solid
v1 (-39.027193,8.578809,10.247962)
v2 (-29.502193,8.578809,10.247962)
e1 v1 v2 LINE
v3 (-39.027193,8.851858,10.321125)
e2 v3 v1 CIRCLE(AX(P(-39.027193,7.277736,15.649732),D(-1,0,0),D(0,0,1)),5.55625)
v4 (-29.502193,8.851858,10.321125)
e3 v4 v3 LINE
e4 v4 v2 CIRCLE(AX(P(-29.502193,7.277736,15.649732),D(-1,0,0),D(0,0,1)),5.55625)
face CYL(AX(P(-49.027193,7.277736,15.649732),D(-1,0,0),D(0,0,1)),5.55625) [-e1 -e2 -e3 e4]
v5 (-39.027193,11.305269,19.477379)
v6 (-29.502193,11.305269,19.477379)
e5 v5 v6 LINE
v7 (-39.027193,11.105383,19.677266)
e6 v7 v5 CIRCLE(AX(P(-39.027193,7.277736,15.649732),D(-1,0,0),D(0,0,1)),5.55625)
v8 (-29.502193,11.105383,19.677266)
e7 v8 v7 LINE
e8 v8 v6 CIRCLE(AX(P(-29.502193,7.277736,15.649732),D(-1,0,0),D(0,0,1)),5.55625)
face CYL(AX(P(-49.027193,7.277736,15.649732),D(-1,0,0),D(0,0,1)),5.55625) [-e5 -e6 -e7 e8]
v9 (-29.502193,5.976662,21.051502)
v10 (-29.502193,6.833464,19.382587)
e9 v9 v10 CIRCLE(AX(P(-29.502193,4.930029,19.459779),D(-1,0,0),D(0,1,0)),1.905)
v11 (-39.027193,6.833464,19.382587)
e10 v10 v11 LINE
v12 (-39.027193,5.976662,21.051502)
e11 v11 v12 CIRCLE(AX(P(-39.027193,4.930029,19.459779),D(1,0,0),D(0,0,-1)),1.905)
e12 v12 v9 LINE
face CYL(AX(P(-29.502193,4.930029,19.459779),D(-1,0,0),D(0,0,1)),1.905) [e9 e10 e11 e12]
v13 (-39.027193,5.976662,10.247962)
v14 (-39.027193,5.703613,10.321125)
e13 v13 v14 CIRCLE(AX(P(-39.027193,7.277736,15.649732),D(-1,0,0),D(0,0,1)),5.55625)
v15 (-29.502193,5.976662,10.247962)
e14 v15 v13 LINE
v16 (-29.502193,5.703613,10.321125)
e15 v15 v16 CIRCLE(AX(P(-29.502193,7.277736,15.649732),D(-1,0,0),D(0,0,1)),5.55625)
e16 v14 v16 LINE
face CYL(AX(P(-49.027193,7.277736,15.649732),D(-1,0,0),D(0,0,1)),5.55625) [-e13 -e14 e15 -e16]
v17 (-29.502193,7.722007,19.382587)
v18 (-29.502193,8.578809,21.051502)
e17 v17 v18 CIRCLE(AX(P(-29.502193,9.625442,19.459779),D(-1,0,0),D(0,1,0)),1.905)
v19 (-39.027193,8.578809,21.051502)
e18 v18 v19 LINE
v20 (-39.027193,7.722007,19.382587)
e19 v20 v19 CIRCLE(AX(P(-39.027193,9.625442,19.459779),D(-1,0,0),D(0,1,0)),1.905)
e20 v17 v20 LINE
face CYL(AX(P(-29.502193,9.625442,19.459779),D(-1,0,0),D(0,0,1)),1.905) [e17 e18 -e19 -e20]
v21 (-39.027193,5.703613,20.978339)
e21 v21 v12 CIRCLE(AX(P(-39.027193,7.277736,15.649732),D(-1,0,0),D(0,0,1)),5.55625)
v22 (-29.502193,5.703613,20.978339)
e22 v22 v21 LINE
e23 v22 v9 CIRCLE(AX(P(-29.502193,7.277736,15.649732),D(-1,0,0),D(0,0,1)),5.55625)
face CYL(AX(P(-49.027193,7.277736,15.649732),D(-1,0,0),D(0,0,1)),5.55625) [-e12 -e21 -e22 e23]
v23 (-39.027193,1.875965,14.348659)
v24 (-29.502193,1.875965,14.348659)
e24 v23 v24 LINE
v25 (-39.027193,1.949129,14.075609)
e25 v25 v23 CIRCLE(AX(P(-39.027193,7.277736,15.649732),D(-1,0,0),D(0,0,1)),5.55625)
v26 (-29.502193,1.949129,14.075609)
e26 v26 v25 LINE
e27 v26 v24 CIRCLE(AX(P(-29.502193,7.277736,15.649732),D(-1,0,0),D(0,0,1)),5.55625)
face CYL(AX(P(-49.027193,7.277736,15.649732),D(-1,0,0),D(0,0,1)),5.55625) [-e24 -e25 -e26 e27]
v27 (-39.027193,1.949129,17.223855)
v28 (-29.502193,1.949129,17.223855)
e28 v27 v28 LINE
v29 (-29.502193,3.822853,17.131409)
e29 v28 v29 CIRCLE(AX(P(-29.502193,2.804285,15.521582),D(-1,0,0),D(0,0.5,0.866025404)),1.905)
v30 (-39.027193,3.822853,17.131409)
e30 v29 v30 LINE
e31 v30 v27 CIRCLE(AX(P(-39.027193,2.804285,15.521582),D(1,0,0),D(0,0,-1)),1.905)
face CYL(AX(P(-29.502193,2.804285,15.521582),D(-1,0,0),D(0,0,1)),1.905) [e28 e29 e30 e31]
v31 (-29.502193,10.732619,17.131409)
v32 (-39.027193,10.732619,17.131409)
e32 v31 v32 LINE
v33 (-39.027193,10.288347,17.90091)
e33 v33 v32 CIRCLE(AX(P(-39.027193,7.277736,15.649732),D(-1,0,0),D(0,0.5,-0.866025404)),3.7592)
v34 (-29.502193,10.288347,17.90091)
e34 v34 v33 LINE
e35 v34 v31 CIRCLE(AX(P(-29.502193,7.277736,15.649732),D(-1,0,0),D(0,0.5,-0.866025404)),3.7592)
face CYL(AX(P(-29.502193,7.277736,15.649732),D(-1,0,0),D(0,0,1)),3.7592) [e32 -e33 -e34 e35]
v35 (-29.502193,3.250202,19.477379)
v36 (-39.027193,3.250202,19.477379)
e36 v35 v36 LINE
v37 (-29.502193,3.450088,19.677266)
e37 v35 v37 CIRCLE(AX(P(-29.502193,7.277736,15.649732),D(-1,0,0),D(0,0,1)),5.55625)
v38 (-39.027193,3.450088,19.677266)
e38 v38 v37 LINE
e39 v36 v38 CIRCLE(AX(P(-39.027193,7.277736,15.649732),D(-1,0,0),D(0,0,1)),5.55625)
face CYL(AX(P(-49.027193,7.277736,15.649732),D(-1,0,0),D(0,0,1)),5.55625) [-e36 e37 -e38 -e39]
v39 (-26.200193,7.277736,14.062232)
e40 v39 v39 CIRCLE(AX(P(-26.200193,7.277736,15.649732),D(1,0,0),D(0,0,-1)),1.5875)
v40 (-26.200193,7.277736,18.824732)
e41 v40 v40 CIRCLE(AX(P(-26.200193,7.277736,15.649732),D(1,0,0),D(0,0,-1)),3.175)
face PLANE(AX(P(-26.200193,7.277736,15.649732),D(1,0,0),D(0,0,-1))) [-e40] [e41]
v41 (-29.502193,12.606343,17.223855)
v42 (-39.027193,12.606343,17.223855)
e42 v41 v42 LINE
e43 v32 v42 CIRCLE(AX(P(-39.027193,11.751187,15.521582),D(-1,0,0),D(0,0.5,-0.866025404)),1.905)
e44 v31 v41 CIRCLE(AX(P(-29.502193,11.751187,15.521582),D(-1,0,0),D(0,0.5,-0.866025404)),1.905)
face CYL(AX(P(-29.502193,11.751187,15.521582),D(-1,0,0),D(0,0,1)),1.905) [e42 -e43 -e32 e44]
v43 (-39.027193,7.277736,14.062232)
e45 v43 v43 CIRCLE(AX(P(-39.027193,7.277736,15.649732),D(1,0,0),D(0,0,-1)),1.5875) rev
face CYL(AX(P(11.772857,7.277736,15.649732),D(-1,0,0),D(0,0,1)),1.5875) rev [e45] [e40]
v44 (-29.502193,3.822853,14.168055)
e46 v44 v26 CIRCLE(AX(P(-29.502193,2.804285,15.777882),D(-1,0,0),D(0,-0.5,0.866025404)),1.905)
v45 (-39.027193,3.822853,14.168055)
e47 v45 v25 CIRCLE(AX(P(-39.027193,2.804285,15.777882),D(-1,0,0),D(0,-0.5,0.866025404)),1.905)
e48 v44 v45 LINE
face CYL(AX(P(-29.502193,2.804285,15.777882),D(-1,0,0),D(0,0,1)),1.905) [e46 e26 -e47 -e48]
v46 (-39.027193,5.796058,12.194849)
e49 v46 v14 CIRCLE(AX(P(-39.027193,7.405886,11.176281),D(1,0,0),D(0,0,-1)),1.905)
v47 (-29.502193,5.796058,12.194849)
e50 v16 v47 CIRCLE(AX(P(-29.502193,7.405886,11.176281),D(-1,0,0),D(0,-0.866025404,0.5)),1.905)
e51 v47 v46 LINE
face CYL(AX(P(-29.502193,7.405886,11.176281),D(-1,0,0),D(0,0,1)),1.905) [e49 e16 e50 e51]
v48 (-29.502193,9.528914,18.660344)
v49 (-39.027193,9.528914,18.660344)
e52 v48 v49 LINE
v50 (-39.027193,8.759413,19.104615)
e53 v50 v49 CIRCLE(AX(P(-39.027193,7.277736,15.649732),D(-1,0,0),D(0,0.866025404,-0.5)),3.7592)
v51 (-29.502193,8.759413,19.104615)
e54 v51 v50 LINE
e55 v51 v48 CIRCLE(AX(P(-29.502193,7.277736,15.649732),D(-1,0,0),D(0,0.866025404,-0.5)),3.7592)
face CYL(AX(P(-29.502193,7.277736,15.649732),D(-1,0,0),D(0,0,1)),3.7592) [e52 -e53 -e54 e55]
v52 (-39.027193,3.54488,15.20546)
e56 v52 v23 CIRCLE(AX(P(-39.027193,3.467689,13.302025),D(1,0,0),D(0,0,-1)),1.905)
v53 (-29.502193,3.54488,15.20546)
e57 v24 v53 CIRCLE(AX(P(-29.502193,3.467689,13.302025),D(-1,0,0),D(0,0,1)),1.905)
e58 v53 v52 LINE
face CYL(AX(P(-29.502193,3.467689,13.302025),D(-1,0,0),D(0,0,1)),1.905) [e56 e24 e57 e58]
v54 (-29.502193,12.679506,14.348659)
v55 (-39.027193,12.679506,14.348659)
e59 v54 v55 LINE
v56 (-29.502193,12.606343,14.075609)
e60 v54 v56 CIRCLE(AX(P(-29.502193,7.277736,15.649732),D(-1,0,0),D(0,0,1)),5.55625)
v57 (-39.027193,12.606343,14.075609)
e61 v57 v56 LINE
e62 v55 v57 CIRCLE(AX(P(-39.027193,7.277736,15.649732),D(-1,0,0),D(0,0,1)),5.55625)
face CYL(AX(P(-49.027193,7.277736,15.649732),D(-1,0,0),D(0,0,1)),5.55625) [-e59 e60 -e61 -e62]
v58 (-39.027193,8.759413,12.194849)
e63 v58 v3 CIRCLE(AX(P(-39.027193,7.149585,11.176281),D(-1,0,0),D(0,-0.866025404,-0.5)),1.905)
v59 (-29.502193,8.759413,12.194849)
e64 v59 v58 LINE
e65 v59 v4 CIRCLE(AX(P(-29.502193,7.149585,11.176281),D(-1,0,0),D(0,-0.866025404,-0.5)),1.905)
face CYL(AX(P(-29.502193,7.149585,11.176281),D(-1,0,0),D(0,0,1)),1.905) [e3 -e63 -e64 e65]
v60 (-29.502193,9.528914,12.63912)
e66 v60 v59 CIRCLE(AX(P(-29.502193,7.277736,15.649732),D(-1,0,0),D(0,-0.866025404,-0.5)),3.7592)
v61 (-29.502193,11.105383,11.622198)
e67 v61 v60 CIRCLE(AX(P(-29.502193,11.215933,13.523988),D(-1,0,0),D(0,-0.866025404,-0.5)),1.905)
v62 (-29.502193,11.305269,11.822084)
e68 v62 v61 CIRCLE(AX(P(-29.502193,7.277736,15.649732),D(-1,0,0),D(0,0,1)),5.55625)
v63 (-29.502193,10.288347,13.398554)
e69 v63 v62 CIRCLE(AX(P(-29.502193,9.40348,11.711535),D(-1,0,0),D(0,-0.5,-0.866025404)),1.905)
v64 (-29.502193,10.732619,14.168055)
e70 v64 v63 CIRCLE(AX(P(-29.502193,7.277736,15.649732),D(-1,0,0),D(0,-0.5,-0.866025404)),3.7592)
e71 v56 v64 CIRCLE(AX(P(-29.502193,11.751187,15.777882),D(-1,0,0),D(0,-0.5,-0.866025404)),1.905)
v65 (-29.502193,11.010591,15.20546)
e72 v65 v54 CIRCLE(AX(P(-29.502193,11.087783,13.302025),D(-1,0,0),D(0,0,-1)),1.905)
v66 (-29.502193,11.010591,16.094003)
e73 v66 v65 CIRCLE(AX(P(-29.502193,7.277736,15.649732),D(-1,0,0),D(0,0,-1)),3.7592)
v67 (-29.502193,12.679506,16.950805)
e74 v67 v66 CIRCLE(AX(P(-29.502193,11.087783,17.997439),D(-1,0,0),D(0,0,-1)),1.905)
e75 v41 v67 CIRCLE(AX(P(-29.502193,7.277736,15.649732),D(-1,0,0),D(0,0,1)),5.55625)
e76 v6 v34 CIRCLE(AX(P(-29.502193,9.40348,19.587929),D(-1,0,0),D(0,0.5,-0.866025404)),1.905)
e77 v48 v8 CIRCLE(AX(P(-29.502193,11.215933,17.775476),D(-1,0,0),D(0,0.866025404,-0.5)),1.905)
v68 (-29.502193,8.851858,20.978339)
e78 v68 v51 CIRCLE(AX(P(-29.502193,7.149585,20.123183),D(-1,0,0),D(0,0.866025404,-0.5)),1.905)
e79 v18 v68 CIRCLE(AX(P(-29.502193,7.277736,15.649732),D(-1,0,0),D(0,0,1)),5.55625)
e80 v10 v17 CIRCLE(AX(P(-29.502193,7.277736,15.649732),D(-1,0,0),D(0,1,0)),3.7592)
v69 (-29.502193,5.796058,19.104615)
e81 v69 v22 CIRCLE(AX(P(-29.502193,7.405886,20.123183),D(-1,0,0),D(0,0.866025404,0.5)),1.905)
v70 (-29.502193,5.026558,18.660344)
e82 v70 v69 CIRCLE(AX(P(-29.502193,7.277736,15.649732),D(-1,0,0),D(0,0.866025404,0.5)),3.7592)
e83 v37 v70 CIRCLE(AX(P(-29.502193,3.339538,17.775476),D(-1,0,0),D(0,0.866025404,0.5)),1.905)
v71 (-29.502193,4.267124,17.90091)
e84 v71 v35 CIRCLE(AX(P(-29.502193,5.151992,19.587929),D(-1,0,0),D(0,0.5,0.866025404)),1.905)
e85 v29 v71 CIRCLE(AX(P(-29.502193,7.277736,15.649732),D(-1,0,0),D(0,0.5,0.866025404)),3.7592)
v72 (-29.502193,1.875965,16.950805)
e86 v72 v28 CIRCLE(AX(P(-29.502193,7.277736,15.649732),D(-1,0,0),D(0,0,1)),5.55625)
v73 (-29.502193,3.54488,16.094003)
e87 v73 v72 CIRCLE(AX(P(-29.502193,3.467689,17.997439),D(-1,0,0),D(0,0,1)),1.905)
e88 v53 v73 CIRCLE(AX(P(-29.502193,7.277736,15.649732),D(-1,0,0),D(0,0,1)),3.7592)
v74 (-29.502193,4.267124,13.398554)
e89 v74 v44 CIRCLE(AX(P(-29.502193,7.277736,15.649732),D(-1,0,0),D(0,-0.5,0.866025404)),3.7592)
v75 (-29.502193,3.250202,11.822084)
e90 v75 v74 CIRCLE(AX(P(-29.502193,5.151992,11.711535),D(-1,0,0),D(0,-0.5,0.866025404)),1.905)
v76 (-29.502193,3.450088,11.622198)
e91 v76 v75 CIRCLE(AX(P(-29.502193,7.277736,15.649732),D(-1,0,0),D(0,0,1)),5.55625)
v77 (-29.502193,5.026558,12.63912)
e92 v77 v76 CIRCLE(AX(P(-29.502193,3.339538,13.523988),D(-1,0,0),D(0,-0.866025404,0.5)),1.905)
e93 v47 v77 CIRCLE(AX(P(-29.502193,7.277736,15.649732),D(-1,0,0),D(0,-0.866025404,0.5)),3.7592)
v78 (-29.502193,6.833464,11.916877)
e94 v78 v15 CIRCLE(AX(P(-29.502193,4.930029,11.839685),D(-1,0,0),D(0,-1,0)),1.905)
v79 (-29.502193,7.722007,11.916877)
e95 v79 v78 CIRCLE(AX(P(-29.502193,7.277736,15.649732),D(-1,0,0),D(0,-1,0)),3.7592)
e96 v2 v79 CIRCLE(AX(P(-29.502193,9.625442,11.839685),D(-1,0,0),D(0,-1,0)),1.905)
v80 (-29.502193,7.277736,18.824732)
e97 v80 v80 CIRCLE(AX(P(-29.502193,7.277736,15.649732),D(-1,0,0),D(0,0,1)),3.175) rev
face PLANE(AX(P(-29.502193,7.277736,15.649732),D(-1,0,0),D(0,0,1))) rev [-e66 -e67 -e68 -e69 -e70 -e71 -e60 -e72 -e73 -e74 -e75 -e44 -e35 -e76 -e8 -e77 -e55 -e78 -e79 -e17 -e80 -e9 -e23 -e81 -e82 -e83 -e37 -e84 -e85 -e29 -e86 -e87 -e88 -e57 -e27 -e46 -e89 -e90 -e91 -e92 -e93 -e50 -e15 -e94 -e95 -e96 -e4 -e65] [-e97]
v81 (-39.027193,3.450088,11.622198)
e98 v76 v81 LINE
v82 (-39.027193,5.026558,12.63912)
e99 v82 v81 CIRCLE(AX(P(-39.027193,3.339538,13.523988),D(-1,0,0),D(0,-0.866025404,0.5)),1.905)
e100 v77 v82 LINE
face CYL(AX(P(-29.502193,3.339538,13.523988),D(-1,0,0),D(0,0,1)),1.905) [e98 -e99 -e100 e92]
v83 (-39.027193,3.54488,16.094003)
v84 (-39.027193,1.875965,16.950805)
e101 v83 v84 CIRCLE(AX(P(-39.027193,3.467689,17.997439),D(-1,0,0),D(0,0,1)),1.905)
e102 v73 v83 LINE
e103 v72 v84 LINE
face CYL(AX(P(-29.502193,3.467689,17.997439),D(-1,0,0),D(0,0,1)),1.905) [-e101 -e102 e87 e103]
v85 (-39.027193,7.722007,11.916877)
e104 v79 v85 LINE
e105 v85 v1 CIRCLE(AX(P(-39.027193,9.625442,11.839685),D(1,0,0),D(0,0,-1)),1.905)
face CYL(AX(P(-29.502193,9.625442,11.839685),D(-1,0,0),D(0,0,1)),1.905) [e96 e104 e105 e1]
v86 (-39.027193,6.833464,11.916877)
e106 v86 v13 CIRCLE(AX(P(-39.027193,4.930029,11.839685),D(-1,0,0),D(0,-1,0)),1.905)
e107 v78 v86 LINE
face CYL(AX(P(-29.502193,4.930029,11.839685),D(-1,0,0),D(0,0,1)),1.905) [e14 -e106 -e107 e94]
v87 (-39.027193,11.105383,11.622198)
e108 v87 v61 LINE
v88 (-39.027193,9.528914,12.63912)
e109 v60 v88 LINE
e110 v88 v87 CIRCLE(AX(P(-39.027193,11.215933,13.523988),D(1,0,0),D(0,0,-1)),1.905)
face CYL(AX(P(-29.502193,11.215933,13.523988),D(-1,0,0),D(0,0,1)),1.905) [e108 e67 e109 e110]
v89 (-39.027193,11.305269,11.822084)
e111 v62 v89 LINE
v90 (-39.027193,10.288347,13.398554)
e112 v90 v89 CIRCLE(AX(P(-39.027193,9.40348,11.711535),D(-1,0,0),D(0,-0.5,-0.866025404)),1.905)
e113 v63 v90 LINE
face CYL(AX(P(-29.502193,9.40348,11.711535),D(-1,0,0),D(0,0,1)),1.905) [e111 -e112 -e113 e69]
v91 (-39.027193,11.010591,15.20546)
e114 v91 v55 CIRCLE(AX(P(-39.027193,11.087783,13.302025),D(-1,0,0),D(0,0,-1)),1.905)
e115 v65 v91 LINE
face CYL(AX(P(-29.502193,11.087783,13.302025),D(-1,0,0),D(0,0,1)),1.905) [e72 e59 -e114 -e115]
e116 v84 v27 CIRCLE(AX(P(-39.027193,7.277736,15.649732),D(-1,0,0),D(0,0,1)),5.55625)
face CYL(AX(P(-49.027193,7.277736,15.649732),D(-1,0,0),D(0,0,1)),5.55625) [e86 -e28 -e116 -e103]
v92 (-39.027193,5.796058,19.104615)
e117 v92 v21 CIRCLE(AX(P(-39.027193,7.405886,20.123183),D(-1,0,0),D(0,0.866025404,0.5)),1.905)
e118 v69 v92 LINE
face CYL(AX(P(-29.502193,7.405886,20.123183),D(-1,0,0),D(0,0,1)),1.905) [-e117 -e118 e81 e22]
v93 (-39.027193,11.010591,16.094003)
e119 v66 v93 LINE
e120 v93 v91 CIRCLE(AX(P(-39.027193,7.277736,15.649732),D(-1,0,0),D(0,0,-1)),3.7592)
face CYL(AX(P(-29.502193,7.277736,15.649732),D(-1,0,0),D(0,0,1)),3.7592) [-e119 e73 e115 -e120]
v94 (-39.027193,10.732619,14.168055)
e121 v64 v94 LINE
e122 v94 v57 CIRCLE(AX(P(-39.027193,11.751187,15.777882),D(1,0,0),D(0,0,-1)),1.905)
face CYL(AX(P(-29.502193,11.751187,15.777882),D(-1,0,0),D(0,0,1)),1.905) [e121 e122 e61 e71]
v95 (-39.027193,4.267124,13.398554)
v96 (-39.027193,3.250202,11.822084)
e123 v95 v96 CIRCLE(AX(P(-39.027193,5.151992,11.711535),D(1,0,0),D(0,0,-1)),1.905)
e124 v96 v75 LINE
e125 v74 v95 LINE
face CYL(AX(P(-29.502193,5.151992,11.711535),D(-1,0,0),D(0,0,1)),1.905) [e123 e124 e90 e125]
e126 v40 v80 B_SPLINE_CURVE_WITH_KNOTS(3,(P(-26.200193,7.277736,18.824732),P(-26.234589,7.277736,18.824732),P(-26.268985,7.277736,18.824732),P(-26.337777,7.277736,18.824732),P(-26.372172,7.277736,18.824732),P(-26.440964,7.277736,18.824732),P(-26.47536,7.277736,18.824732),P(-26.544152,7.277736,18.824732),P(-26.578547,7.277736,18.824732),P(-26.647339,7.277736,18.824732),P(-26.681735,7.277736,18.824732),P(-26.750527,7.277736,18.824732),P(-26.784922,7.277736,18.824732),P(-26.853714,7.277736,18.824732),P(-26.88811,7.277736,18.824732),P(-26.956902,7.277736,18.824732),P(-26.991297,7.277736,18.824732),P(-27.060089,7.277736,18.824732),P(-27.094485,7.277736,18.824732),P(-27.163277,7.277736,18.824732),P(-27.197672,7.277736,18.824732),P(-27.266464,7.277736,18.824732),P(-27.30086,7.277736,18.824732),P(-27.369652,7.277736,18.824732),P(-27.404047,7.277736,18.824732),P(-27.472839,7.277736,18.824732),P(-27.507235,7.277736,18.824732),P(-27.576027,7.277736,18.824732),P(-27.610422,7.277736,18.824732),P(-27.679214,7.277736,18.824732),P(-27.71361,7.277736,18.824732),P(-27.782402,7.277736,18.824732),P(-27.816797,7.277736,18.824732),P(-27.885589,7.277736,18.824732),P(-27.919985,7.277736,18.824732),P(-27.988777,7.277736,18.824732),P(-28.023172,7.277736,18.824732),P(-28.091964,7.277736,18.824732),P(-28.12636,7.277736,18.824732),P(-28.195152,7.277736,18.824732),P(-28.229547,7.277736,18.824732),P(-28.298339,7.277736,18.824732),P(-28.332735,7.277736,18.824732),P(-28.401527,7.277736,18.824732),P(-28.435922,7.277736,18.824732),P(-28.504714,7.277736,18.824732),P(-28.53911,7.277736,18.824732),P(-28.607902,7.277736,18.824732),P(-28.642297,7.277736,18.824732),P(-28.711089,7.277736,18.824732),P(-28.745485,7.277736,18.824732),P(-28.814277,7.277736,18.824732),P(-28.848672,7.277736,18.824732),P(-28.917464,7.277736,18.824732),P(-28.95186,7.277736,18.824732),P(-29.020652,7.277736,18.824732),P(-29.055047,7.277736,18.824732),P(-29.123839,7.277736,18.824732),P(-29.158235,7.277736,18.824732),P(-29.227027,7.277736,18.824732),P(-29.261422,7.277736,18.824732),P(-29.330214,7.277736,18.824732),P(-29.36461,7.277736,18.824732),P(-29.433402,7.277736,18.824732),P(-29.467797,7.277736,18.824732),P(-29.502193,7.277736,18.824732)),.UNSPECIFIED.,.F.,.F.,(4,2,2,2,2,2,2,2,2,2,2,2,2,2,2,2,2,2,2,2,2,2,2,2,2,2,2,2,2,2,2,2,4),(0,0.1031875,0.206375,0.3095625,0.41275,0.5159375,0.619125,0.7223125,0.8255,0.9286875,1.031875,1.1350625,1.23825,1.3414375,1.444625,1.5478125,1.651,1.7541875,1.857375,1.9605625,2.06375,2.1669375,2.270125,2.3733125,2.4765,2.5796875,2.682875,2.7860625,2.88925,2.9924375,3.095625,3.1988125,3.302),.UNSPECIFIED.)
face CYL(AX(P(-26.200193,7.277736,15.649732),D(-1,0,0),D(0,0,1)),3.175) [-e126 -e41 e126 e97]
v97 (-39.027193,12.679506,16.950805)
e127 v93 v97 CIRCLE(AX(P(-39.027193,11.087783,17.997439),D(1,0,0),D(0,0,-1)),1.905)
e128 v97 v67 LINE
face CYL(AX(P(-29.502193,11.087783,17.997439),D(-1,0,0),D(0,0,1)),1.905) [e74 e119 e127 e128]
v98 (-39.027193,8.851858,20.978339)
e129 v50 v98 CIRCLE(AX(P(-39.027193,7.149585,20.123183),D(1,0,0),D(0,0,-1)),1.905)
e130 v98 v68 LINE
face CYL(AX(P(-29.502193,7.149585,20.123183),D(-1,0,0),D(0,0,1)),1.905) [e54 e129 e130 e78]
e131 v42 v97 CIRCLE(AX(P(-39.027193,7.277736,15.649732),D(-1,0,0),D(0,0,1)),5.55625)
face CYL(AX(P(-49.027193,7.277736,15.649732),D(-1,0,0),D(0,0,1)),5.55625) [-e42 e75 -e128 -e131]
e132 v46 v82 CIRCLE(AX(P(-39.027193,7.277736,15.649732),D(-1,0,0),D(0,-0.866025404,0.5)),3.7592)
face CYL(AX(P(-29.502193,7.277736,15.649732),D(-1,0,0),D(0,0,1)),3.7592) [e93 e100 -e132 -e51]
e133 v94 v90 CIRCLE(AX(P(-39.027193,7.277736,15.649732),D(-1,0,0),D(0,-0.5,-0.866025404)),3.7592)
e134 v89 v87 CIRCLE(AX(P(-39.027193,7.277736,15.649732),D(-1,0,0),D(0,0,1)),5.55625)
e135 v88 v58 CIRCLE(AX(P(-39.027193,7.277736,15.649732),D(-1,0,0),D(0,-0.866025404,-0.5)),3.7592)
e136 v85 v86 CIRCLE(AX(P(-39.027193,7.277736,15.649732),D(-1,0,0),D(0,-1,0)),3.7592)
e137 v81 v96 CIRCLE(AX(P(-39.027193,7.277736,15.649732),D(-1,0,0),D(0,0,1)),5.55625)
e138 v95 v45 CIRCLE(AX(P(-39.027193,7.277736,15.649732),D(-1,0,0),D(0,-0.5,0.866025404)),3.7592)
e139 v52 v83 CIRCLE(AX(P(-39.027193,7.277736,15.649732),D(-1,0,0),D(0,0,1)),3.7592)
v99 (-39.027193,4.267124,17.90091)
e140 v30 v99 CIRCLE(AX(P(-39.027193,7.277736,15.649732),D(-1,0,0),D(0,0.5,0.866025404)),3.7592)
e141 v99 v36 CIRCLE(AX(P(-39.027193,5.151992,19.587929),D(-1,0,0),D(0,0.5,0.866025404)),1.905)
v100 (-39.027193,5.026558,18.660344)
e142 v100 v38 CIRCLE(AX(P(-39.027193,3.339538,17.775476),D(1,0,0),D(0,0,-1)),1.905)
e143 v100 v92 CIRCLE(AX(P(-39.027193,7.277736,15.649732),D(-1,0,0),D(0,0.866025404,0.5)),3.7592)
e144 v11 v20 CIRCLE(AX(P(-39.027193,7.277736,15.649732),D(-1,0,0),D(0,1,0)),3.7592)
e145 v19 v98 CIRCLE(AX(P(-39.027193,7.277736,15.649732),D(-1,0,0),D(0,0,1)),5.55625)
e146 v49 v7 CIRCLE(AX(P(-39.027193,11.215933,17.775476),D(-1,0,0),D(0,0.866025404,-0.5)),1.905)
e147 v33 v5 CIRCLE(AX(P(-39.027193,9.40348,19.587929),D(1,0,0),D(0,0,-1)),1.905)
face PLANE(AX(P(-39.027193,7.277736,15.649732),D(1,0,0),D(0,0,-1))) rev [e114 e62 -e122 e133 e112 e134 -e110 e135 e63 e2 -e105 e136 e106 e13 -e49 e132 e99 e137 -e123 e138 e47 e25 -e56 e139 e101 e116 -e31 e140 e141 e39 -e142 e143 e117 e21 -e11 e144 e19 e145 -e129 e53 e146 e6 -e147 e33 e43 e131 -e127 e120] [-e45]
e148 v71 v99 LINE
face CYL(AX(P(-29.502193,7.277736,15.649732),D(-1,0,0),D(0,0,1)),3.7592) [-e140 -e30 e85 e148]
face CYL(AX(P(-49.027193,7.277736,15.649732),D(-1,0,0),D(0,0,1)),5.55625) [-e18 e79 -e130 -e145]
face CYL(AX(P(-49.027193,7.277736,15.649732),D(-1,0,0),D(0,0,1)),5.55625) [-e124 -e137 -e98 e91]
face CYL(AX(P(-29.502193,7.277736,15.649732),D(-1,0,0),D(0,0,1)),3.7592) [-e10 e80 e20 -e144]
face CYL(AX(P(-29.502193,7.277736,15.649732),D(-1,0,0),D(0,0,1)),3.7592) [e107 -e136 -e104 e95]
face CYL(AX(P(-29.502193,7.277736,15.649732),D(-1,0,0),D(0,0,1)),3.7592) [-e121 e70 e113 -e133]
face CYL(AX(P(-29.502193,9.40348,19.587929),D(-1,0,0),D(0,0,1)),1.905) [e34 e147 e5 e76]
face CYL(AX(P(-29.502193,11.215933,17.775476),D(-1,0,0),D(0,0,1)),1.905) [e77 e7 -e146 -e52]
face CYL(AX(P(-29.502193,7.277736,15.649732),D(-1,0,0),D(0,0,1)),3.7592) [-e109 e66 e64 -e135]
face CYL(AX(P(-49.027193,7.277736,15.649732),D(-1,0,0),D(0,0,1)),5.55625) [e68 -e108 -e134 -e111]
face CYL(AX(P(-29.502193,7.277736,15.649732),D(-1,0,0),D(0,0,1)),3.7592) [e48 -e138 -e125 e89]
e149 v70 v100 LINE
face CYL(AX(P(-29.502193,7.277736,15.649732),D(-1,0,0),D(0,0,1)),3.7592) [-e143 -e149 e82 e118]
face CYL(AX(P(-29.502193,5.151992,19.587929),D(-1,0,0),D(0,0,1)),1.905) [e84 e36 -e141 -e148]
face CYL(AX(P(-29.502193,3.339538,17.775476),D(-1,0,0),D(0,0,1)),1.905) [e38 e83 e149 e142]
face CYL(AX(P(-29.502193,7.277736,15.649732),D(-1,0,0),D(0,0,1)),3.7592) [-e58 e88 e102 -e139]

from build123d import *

# Parameters (mm, degrees)
SPUR_START             = -39.027193307
SPUR_GEAR_AI_OUTLINE_R = 1.5875
SPUR_GEAR_AI_DEPTH     = 9.525
SKETCH1_R              = 3.175
SKETCH1_R_2            = 1.5875
BOSS_EXTRUDE1_DEPTH    = 3.302


# Read off the part's stored shape, not the designer's step: spur gear_ai
with BuildPart() as part:
    # spur gear_ai outline → spur gear_ai (new body)
    with BuildSketch(Plane.YZ.offset(SPUR_START)):
        with BuildLine():
            ThreePointArc((11.105383233, 11.622198105), (11.20659768, 11.720869772), (11.305269347, 11.822084219))
            ThreePointArc((11.305269347, 11.822084219), (11.004316623, 12.744174963), (10.288347307, 13.398553922))
            ThreePointArc((10.288347307, 13.398553922), (10.533298325, 13.770131825), (10.732618719, 14.168054581))
            ThreePointArc((10.732618719, 14.168054581), (11.657312179, 13.875196444), (12.60634255, 14.075609112))
            ThreePointArc((12.60634255, 14.075609112), (12.644660999, 14.211668506), (12.679505946, 14.348658621))
            ThreePointArc((12.679505946, 14.348658621), (11.95782787, 14.996736269), (11.010590774, 15.205460412))
            ThreePointArc((11.010590774, 15.205460412), (11.036935627, 15.649731825), (11.010590774, 16.094003238))
            ThreePointArc((11.010590774, 16.094003238), (11.957827869, 16.302727382), (12.679505946, 16.950805029))
            ThreePointArc((12.679505946, 16.950805029), (12.644660999, 17.087795145), (12.60634255, 17.223854538))
            ThreePointArc((12.60634255, 17.223854538), (11.657312179, 17.424267206), (10.732618719, 17.131409069))
            ThreePointArc((10.732618719, 17.131409069), (10.533298325, 17.529331825), (10.288347307, 17.900909728))
            ThreePointArc((10.288347307, 17.900909728), (11.004316623, 18.555288687), (11.305269347, 19.477379431))
            ThreePointArc((11.305269347, 19.477379431), (11.20659768, 19.578593878), (11.105383233, 19.677265545))
            ThreePointArc((11.105383233, 19.677265545), (10.183292489, 19.376312821), (9.52891353, 18.660343505))
            ThreePointArc((9.52891353, 18.660343505), (9.157335627, 18.905294523), (8.759412871, 19.104614918))
            ThreePointArc((8.759412871, 19.104614918), (9.052271007, 20.029308378), (8.85185834, 20.978338749))
            ThreePointArc((8.85185834, 20.978338749), (8.715798946, 21.016657197), (8.57880883, 21.051502144))
            ThreePointArc((8.57880883, 21.051502144), (7.930731183, 20.329824068), (7.722007039, 19.382586973))
            ThreePointArc((7.722007039, 19.382586973), (7.277735627, 19.408931825), (6.833464214, 19.382586973))
            ThreePointArc((6.833464214, 19.382586973), (6.62474007, 20.329824068), (5.976662423, 21.051502144))
            ThreePointArc((5.976662423, 21.051502144), (5.839672308, 21.016657197), (5.703612914, 20.978338749))
            ThreePointArc((5.703612914, 20.978338749), (5.503200246, 20.029308378), (5.796058383, 19.104614918))
            ThreePointArc((5.796058383, 19.104614918), (5.398135627, 18.905294523), (5.026557723, 18.660343505))
            ThreePointArc((5.026557723, 18.660343505), (4.372178765, 19.376312821), (3.45008802, 19.677265545))
            ThreePointArc((3.45008802, 19.677265545), (3.348873574, 19.578593878), (3.250201907, 19.477379431))
            ThreePointArc((3.250201907, 19.477379431), (3.551154631, 18.555288687), (4.267123947, 17.900909728))
            ThreePointArc((4.267123947, 17.900909728), (4.022172929, 17.529331825), (3.822852534, 17.131409069))
            ThreePointArc((3.822852534, 17.131409069), (2.898159074, 17.424267206), (1.949128703, 17.223854538))
            ThreePointArc((1.949128703, 17.223854538), (1.910810254, 17.087795145), (1.875965308, 16.950805029))
            ThreePointArc((1.875965308, 16.950805029), (2.597643384, 16.302727382), (3.544880479, 16.094003238))
            ThreePointArc((3.544880479, 16.094003238), (3.518535627, 15.649731825), (3.544880479, 15.205460412))
            ThreePointArc((3.544880479, 15.205460412), (2.597643384, 14.996736269), (1.875965308, 14.348658621))
            ThreePointArc((1.875965308, 14.348658621), (1.910810254, 14.211668505), (1.949128703, 14.075609112))
            ThreePointArc((1.949128703, 14.075609112), (2.898159074, 13.875196444), (3.822852534, 14.168054581))
            ThreePointArc((3.822852534, 14.168054581), (4.022172929, 13.770131825), (4.267123947, 13.398553922))
            ThreePointArc((4.267123947, 13.398553922), (3.551154631, 12.744174963), (3.250201907, 11.822084219))
            ThreePointArc((3.250201907, 11.822084219), (3.348873574, 11.720869772), (3.45008802, 11.622198105))
            ThreePointArc((3.45008802, 11.622198105), (4.372178765, 11.923150829), (5.026557723, 12.639120145))
            ThreePointArc((5.026557723, 12.639120145), (5.398135627, 12.394169127), (5.796058383, 12.194848732))
            ThreePointArc((5.796058383, 12.194848732), (5.503200246, 11.270155272), (5.703612914, 10.321124901))
            ThreePointArc((5.703612914, 10.321124901), (5.839672308, 10.282806453), (5.976662423, 10.247961506))
            ThreePointArc((5.976662423, 10.247961506), (6.62474007, 10.969639583), (6.833464214, 11.916876678))
            ThreePointArc((6.833464214, 11.916876678), (7.277735627, 11.890531825), (7.722007039, 11.916876678))
            ThreePointArc((7.722007039, 11.916876678), (7.930731183, 10.969639583), (8.57880883, 10.247961506))
            ThreePointArc((8.57880883, 10.247961506), (8.715798946, 10.282806453), (8.85185834, 10.321124901))
            ThreePointArc((8.85185834, 10.321124901), (9.052271007, 11.270155272), (8.759412871, 12.194848732))
            ThreePointArc((8.759412871, 12.194848732), (9.157335627, 12.394169127), (9.52891353, 12.639120145))
            ThreePointArc((9.52891353, 12.639120145), (10.183292489, 11.923150829), (11.105383233, 11.622198105))
        make_face()
        with Locations((7.277735627, 15.649731825)):
            Circle(SPUR_GEAR_AI_OUTLINE_R, mode=Mode.SUBTRACT)
    extrude(amount=SPUR_GEAR_AI_DEPTH)

    # Sketch1 → Boss-Extrude1 (add)
    with BuildSketch(Plane(origin=(-29.502193307, 0, 0), x_dir=(0, 0, -1), z_dir=(1, 0, 0))):
        with Locations(Location((-15.649731825, 7.277735627, 0), (0, 0, 180))):
            Circle(SKETCH1_R)
        with Locations((-15.649731825, 7.277735627)):
            Circle(SKETCH1_R_2, mode=Mode.SUBTRACT)
    extrude(amount=BOSS_EXTRUDE1_DEPTH)


solid = part.part
